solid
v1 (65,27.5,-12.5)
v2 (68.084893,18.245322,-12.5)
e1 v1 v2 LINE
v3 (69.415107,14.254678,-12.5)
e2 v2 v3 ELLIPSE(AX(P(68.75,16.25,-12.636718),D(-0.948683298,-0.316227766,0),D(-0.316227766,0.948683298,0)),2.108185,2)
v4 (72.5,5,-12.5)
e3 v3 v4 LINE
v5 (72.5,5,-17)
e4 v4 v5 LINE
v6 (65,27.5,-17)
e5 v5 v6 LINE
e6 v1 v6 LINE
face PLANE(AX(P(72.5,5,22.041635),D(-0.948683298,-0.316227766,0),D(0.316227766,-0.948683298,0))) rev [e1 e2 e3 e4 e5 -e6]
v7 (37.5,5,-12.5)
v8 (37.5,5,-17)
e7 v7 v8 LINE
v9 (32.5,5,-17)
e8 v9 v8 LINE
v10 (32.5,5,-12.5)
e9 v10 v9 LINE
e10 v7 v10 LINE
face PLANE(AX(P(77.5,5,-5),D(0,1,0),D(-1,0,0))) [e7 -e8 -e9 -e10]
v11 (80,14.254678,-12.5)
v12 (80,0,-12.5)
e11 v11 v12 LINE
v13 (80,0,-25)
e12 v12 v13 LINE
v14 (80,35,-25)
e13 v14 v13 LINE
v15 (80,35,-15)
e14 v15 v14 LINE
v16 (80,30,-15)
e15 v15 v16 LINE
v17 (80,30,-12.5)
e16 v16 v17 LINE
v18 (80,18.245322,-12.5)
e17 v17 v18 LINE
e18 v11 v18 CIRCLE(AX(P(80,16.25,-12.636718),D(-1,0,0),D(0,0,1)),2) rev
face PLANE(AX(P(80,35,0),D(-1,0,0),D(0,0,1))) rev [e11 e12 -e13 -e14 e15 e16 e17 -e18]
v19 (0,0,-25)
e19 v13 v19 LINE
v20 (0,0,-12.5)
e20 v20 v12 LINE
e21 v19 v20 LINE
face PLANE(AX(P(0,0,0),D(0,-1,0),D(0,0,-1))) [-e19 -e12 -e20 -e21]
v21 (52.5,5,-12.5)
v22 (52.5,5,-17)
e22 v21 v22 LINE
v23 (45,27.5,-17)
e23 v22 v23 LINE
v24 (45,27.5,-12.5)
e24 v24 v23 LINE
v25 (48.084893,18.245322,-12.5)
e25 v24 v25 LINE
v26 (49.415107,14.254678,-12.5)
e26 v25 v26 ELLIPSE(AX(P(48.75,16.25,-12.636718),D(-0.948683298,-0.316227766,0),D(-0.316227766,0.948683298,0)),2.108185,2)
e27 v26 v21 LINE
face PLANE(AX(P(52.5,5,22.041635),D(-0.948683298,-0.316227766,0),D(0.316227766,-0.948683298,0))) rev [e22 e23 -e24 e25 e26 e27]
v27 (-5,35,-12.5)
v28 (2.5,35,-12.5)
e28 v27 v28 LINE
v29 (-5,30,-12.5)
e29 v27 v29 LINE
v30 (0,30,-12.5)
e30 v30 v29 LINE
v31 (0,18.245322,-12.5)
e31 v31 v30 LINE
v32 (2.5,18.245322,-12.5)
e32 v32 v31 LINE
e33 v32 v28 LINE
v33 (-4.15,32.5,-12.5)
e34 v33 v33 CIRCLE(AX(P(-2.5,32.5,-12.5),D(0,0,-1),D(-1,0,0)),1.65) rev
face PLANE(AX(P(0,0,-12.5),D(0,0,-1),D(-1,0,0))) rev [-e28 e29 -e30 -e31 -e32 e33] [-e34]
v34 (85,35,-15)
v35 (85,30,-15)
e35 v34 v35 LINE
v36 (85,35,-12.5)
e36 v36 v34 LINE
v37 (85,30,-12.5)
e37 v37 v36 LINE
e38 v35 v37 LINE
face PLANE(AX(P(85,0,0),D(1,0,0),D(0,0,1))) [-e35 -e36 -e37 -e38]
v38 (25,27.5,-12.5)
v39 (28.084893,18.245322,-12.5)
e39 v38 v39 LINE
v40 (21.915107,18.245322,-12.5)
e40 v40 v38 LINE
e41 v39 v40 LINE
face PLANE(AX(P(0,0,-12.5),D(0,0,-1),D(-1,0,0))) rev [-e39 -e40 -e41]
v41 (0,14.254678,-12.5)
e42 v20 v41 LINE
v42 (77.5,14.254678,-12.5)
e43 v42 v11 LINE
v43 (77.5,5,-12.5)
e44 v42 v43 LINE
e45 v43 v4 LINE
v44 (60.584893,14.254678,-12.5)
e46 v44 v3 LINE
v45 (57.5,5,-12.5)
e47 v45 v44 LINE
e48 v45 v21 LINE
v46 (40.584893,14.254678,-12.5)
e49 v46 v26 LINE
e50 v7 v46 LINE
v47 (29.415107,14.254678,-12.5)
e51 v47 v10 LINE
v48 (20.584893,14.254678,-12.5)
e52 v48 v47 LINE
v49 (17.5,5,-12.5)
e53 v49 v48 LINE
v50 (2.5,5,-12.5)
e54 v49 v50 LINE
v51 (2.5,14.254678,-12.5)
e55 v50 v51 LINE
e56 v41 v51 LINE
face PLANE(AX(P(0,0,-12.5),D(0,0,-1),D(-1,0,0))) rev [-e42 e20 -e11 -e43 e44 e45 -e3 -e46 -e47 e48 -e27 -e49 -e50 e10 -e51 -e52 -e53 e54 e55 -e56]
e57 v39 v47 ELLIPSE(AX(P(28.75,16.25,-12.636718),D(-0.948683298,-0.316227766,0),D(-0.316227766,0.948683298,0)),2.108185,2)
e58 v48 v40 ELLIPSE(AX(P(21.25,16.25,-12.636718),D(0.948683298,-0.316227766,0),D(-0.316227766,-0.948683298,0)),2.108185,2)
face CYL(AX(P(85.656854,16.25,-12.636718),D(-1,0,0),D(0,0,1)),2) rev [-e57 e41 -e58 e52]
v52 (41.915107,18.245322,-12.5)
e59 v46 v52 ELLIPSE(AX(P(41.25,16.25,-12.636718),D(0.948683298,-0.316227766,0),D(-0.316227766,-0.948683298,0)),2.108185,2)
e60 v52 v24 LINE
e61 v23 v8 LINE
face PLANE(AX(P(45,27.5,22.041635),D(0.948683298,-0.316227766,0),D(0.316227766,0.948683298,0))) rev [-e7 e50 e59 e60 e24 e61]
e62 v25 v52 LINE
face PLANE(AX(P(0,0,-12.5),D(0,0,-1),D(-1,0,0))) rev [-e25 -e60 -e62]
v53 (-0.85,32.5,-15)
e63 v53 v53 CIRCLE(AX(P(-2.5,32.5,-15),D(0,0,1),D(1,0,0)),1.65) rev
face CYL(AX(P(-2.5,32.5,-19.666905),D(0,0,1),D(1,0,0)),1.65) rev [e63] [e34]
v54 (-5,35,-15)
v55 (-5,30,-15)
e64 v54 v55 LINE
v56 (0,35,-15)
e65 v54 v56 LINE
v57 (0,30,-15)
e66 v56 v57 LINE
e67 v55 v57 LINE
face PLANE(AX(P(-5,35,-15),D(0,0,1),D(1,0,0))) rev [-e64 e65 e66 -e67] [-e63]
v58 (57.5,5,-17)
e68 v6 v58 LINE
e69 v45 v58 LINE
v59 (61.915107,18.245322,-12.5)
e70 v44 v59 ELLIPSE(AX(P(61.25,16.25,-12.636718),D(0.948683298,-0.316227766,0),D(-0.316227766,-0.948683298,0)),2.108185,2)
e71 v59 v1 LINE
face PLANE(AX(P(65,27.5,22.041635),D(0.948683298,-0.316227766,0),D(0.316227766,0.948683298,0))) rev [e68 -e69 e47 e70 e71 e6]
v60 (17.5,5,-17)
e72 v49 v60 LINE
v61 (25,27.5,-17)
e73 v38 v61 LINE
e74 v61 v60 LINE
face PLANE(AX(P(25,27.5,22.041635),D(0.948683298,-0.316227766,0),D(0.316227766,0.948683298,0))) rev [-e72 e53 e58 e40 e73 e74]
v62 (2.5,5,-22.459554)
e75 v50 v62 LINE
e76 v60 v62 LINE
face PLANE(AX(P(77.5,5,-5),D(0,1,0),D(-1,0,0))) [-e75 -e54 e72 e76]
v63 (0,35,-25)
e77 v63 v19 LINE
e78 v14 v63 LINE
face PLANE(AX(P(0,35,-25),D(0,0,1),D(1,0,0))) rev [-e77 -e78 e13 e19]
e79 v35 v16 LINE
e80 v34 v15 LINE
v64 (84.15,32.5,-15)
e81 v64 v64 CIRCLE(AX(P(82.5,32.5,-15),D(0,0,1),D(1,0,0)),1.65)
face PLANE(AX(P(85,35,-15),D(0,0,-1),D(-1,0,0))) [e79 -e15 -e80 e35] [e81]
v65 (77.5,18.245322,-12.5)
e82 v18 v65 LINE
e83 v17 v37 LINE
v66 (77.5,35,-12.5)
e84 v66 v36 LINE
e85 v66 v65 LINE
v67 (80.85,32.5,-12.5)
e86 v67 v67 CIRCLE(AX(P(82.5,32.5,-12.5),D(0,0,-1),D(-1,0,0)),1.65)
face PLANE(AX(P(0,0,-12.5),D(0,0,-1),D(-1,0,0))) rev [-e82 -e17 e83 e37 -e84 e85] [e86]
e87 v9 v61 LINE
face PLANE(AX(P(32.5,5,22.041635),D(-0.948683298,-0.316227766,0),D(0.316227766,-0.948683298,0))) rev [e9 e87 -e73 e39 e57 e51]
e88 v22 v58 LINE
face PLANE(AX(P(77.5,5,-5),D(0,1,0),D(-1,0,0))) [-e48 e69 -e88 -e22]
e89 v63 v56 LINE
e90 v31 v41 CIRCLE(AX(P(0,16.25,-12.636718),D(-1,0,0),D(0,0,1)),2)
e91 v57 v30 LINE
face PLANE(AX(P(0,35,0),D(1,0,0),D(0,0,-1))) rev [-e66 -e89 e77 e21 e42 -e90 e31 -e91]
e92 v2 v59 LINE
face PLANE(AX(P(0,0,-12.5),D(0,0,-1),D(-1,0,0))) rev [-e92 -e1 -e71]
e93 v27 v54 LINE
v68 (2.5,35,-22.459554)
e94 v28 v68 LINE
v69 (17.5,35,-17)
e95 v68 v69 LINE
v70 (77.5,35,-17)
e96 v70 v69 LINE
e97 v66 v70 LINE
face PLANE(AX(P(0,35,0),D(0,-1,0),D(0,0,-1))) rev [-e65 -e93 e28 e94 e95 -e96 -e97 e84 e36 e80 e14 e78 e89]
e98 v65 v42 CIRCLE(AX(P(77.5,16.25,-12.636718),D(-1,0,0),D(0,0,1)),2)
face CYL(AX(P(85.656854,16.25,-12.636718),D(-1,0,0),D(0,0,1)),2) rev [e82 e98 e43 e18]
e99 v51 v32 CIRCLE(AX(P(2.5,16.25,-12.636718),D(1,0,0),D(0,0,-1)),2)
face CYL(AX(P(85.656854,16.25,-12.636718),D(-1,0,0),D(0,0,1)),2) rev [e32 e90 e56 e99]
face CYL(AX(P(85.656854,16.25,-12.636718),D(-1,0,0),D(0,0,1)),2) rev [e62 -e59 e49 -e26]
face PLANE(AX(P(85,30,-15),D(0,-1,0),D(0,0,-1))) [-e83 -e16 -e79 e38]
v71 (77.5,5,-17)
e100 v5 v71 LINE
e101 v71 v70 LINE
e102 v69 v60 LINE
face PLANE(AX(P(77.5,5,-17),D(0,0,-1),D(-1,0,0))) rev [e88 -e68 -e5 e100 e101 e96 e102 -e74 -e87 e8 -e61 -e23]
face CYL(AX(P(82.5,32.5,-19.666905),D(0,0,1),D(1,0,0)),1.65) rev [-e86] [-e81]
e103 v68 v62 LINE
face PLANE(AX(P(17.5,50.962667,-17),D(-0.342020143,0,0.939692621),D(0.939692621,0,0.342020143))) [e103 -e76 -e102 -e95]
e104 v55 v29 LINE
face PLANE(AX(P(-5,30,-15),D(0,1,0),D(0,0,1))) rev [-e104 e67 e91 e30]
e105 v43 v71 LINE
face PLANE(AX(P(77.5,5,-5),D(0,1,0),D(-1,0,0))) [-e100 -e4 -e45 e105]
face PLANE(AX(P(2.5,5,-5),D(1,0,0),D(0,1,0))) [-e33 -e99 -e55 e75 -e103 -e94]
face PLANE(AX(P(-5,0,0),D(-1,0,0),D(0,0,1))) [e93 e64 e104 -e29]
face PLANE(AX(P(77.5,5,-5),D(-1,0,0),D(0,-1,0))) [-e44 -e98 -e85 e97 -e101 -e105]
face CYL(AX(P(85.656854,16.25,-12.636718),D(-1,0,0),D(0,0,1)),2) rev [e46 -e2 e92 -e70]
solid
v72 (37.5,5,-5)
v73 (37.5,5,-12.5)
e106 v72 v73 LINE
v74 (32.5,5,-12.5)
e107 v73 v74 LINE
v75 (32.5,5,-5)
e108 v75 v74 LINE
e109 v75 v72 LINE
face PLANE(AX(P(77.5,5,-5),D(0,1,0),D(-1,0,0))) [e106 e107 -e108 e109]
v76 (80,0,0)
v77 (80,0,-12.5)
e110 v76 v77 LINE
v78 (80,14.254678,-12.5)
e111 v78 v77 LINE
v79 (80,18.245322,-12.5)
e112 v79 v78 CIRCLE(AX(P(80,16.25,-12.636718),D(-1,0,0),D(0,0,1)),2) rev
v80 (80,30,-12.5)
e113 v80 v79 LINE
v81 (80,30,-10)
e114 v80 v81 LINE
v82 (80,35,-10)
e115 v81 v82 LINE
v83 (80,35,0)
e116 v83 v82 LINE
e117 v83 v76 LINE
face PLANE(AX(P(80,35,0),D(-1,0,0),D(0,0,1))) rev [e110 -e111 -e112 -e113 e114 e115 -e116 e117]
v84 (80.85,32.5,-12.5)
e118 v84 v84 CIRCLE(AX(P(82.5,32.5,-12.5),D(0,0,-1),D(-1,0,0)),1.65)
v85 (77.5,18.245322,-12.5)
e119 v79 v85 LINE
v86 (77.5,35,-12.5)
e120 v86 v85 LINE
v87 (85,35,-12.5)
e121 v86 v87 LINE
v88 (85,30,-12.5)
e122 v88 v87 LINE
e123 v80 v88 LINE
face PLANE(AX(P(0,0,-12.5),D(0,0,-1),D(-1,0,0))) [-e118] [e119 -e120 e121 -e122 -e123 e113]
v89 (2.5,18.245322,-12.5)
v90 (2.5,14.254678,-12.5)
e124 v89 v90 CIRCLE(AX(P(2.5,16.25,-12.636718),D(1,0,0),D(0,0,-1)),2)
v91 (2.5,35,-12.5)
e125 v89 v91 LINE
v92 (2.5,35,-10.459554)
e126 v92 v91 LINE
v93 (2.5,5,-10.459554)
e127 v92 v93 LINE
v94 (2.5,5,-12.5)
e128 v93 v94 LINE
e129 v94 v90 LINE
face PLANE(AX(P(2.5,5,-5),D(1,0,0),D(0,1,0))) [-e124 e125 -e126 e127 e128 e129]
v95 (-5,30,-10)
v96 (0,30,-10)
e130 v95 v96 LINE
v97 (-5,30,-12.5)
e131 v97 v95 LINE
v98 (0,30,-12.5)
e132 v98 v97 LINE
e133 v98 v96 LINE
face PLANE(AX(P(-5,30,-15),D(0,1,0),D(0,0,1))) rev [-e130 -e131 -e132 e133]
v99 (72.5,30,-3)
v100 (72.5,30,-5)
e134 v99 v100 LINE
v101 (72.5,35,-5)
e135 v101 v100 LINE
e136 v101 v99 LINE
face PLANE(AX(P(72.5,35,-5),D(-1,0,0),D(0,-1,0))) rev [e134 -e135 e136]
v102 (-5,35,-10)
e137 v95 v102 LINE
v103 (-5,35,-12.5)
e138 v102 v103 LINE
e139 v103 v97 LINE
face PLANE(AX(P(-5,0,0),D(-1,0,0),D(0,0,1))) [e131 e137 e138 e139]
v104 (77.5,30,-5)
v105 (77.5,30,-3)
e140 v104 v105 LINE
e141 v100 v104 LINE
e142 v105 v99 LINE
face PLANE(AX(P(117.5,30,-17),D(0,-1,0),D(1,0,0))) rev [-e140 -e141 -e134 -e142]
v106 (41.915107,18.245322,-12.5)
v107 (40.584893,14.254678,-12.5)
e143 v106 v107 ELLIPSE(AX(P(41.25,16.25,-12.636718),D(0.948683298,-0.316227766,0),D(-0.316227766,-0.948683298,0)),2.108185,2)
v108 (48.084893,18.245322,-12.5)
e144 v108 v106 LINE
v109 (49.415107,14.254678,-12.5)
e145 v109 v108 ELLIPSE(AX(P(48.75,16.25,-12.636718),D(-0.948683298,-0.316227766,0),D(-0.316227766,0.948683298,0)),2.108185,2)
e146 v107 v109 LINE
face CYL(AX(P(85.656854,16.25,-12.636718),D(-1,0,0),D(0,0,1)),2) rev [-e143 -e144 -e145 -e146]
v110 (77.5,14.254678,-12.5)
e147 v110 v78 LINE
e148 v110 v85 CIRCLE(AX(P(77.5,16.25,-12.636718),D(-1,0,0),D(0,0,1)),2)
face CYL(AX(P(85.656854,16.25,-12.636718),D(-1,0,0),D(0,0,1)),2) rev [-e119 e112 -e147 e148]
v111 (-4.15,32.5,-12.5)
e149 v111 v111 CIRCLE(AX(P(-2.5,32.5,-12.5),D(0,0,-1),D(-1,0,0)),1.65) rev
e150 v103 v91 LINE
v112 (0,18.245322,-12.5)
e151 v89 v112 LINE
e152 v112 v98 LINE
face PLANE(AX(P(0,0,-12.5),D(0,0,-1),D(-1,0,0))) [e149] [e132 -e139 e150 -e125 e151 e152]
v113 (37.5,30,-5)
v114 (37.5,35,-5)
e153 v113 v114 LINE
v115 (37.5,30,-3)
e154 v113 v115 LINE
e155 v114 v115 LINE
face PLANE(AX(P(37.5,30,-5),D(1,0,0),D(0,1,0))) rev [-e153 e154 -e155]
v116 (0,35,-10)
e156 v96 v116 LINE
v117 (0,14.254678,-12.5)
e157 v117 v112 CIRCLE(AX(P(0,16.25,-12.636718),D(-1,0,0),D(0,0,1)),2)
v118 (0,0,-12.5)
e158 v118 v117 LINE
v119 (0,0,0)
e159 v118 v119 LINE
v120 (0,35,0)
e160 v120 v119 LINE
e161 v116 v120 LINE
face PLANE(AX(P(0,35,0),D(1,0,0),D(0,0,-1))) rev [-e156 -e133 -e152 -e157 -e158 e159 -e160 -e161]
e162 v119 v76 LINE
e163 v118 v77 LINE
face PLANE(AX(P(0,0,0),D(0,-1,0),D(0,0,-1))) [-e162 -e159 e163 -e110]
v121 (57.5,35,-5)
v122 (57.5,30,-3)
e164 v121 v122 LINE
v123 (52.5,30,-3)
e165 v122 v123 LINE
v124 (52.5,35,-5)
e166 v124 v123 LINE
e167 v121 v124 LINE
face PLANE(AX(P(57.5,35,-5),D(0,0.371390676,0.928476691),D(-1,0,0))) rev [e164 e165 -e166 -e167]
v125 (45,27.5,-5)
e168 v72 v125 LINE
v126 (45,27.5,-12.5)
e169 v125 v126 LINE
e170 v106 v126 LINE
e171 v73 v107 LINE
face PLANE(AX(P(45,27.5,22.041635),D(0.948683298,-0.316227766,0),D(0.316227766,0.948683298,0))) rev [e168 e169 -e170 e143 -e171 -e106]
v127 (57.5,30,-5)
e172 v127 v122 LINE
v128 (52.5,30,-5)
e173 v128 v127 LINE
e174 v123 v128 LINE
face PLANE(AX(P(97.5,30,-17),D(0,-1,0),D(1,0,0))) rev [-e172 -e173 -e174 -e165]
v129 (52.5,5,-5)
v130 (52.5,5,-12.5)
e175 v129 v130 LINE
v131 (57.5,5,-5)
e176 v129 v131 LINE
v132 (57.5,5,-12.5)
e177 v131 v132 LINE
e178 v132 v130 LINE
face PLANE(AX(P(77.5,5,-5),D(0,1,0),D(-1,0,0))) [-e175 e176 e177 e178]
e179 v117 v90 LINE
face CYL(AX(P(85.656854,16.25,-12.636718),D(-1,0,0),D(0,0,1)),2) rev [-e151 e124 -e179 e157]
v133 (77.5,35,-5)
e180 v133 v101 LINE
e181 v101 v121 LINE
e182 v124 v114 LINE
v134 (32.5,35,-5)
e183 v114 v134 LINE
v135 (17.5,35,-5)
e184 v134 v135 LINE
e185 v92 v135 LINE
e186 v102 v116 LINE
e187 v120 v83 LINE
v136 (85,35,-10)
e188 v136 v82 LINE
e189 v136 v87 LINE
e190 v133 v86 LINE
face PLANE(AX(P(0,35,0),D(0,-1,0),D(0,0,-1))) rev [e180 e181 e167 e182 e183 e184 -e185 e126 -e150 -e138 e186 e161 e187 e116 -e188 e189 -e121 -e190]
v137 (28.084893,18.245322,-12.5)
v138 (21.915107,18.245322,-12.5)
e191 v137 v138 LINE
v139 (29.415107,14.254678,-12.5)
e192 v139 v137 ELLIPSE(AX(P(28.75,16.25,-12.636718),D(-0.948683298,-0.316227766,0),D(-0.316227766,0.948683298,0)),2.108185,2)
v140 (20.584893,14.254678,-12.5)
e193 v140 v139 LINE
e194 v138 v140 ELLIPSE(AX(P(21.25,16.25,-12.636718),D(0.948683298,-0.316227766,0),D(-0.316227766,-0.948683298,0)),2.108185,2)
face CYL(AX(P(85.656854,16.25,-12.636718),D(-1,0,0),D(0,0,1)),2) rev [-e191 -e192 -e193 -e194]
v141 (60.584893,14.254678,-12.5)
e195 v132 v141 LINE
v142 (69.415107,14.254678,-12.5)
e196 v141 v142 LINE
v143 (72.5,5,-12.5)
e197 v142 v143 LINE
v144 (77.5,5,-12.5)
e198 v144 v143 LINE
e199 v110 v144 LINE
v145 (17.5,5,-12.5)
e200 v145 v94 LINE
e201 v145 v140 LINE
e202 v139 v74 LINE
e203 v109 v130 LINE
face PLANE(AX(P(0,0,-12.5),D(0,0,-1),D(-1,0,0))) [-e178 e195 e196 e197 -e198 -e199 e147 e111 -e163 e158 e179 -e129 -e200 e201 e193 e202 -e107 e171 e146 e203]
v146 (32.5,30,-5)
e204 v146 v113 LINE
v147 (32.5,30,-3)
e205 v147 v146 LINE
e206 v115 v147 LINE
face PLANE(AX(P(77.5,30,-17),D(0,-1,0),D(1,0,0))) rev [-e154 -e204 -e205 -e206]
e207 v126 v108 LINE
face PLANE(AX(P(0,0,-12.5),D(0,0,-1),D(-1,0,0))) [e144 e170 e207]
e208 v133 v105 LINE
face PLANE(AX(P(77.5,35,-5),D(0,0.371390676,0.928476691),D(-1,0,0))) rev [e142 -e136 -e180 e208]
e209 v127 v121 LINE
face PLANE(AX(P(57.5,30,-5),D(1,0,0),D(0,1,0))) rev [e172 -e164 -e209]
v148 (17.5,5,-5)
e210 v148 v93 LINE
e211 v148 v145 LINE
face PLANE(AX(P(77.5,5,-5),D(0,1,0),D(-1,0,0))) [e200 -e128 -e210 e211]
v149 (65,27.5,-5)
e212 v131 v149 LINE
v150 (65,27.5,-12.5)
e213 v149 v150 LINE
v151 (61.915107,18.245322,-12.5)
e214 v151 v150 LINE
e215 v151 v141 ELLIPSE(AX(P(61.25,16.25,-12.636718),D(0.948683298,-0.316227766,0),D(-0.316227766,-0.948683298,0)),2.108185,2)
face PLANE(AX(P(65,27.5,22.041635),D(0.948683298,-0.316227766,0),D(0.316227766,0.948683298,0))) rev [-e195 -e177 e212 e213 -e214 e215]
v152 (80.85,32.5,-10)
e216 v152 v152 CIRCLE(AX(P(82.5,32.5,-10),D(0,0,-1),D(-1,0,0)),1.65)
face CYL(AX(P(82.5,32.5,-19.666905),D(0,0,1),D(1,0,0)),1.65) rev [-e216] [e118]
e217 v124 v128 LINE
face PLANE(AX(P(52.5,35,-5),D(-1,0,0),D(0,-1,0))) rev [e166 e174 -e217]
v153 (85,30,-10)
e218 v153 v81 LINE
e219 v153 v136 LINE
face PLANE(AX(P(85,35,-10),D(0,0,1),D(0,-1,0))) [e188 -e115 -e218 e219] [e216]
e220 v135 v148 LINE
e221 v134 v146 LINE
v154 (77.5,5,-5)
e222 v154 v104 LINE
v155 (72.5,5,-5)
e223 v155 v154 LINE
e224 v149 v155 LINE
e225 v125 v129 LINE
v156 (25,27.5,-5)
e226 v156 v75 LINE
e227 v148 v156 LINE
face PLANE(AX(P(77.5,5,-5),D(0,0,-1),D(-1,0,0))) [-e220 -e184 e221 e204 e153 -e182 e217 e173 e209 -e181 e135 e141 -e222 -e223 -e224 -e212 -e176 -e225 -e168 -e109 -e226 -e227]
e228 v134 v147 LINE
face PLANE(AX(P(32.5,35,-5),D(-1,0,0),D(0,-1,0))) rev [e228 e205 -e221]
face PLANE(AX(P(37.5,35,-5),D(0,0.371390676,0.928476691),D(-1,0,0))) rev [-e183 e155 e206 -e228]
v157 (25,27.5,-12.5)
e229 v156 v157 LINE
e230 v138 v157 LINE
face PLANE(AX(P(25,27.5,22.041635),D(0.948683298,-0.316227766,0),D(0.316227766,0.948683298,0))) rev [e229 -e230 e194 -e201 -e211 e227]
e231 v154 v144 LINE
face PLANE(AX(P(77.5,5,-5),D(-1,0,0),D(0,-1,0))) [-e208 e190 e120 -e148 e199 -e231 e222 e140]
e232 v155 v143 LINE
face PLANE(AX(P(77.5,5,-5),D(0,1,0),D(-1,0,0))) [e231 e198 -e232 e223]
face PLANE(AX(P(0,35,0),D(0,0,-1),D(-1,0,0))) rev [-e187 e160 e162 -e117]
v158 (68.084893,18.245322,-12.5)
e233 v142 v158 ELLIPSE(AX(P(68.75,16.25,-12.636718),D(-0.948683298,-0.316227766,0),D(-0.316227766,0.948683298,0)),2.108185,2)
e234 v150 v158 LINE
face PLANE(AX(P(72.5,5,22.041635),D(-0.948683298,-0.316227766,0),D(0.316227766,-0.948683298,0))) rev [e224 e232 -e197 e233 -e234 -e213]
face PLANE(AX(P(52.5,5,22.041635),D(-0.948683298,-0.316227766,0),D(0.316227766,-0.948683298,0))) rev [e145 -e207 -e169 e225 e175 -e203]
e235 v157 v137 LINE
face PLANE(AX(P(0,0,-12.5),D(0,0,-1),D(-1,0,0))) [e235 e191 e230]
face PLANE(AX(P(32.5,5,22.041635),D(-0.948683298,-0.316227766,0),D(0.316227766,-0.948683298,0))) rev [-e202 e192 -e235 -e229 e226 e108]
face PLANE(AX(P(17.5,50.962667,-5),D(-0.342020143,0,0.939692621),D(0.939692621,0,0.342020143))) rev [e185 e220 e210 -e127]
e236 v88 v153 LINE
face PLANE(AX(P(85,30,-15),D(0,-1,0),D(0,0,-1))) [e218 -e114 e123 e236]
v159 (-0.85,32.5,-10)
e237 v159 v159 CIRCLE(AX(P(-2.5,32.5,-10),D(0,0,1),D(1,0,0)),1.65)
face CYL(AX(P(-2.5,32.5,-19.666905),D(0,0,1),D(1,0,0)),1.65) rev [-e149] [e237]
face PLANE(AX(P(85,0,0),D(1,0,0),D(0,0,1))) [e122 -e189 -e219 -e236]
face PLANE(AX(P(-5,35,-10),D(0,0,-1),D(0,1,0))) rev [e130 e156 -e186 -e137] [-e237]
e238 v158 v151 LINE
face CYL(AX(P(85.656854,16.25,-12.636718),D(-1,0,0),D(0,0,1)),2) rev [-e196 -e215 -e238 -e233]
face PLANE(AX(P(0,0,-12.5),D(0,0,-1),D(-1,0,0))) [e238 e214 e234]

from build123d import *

# Parameters (mm, degrees)
SKETCH1_W           = 80
SKETCH1_H           = 25
BOSS_EXTRUDE1_DEPTH = 35
CAVITY1_START       = -22.459553514
CAVITY1_DEPTH       = 17.459553514
CAVITY1_START_2     = -17
CAVITY1_2_OUTLINE_W = 5
CAVITY1_2_OUTLINE_H = 5
CAVITY1_2_DEPTH     = 14
CAVITY1_START_3     = 17.5
CAVITY1_3_OUTLINE_W = 30
CAVITY1_3_OUTLINE_H = 5.459553514
CAVITY1_3_DEPTH     = 60
CAVITY1_START_4     = 5
CAVITY1_4_DEPTH     = 30
SKETCH2_W           = 5
SKETCH2_H           = 5
BOSS_EXTRUDE2_DEPTH = 5
SKETCH3_R           = 1.65
CUT_EXTRUDE1_DEPTH  = 5
CUT_EXTRUDE2_REACH  = 97.263
SKETCH4_R           = 2


with BuildPart() as part:
    # Sketch1 → Boss-Extrude1 (new body)
    with BuildSketch(Plane(origin=(0, 0, 0), x_dir=(1, 0, 0), z_dir=(0, 1, 0))):
        with Locations((40, 12.5)):
            Rectangle(SKETCH1_W, SKETCH1_H)
    extrude(amount=BOSS_EXTRUDE1_DEPTH)

    # Cavity1: read off the stored shape, not the designer's step
    # Cavity1 outline → Cavity1 (cut)
    with BuildSketch(Plane.XY.offset(CAVITY1_START)):
        Polygon((2.5, 5), (17.5, 5), (25, 27.5), (32.5, 5), (37.5, 5), (45, 27.5), (52.5, 5), (57.5, 5), (65, 27.5), (72.5, 5), (77.5, 5), (77.5, 30), (72.5, 30), (72.5, 35), (57.5, 35), (57.5, 30), (52.5, 30), (52.5, 35), (37.5, 35), (37.5, 30), (32.5, 30), (32.5, 35), (2.5, 35), align=None)
    extrude(amount=CAVITY1_DEPTH, mode=Mode.SUBTRACT)

    # Cavity1 2 outline → Cavity1 2 (cut)
    with BuildSketch(Plane.XY.offset(CAVITY1_START_2)):
        with Locations((35, 32.5)):
            Rectangle(CAVITY1_2_OUTLINE_W, CAVITY1_2_OUTLINE_H)
        with Locations((55, 32.5)):
            Rectangle(CAVITY1_2_OUTLINE_W, CAVITY1_2_OUTLINE_H)
        with Locations((75, 32.5)):
            Rectangle(CAVITY1_2_OUTLINE_W, CAVITY1_2_OUTLINE_H)
    extrude(amount=CAVITY1_2_DEPTH, mode=Mode.SUBTRACT)

    # Cavity1 3 outline → Cavity1 3 (add)
    with BuildSketch(Plane.YZ.offset(CAVITY1_START_3)):
        Polygon((35, -5), (35, -3), (30, -3), align=None)
        with Locations((20, -19.729776757)):
            Rectangle(CAVITY1_3_OUTLINE_W, CAVITY1_3_OUTLINE_H)
    extrude(amount=CAVITY1_3_DEPTH)

    # Cavity1 4 outline → Cavity1 4 (add)
    with BuildSketch(Plane(origin=(0, 0, 0), x_dir=(1, 0, 0), z_dir=(0, 1, 0)).offset(CAVITY1_START_4)):
        Polygon((17.5, 5), (2.5, 10.459553514), (2.5, 5), align=None)
        Polygon((17.5, 22.459553514), (2.5, 22.459553514), (17.5, 17), align=None)
    extrude(amount=CAVITY1_4_DEPTH)

    # Sketch2 → Boss-Extrude2 (add)
    with BuildSketch(Plane.ZY):
        with Locations((-12.5, 32.5)):
            Rectangle(SKETCH2_W, SKETCH2_H)
    boss_extrude2 = extrude(amount=BOSS_EXTRUDE2_DEPTH)

    # Sketch3 → Cut-Extrude1 (cut)
    with BuildSketch(Plane.XY.offset(-10)):
        with Locations((-2.5, 32.5)):
            Circle(SKETCH3_R)
    cut_extrude1 = extrude(amount=-CUT_EXTRUDE1_DEPTH, mode=Mode.SUBTRACT)

    # Mirror1: Boss-Extrude2, Cut-Extrude1 across plane
    add(boss_extrude2.mirror(Plane.ZY.offset(-40)))
    add(cut_extrude1.mirror(Plane.ZY.offset(-40)), mode=Mode.SUBTRACT)

    # Cut-Extrude2: up to this face of the body (flat: up to its plane)
    cut_extrude2_end = Plane(part.part.faces().sort_by_distance((80, 17.058823529, -12.5))[0])
    # Sketch4 → Cut-Extrude2 (cut, up to the picked face)
    with BuildSketch(Plane.ZY, mode=Mode.PRIVATE) as cut_extrude2_sk1:
        with Locations(Location((-12.636718447, 16.25, 0), (0, 0, 90))):
            Circle(SKETCH4_R)
    cut_extrude2_tool1 = split(extrude(cut_extrude2_sk1.sketch, amount=-CUT_EXTRUDE2_REACH, mode=Mode.PRIVATE), bisect_by=cut_extrude2_end, keep=Keep.BOTH, mode=Mode.PRIVATE)
    add(cut_extrude2_tool1.solids().sort_by(Axis((0, 16.25, -12.636718), (1, 0, 0)))[0], mode=Mode.SUBTRACT)


with BuildPart() as body_2:
    # Split1: the piece on the far side of the plane
    add(part.part)
    split(bisect_by=Plane(origin=(0, 0, -12.5), x_dir=(-1, 0, 0), z_dir=(0, 0, -1)), keep=Keep.BOTTOM)


with BuildPart() as part_1:
    add(part.part)

    # Split1
    split(bisect_by=Plane(origin=(0, 0, -12.5), x_dir=(-1, 0, 0), z_dir=(0, 0, -1)), keep=Keep.TOP)


solid = Compound([body_2.part, part_1.part])
